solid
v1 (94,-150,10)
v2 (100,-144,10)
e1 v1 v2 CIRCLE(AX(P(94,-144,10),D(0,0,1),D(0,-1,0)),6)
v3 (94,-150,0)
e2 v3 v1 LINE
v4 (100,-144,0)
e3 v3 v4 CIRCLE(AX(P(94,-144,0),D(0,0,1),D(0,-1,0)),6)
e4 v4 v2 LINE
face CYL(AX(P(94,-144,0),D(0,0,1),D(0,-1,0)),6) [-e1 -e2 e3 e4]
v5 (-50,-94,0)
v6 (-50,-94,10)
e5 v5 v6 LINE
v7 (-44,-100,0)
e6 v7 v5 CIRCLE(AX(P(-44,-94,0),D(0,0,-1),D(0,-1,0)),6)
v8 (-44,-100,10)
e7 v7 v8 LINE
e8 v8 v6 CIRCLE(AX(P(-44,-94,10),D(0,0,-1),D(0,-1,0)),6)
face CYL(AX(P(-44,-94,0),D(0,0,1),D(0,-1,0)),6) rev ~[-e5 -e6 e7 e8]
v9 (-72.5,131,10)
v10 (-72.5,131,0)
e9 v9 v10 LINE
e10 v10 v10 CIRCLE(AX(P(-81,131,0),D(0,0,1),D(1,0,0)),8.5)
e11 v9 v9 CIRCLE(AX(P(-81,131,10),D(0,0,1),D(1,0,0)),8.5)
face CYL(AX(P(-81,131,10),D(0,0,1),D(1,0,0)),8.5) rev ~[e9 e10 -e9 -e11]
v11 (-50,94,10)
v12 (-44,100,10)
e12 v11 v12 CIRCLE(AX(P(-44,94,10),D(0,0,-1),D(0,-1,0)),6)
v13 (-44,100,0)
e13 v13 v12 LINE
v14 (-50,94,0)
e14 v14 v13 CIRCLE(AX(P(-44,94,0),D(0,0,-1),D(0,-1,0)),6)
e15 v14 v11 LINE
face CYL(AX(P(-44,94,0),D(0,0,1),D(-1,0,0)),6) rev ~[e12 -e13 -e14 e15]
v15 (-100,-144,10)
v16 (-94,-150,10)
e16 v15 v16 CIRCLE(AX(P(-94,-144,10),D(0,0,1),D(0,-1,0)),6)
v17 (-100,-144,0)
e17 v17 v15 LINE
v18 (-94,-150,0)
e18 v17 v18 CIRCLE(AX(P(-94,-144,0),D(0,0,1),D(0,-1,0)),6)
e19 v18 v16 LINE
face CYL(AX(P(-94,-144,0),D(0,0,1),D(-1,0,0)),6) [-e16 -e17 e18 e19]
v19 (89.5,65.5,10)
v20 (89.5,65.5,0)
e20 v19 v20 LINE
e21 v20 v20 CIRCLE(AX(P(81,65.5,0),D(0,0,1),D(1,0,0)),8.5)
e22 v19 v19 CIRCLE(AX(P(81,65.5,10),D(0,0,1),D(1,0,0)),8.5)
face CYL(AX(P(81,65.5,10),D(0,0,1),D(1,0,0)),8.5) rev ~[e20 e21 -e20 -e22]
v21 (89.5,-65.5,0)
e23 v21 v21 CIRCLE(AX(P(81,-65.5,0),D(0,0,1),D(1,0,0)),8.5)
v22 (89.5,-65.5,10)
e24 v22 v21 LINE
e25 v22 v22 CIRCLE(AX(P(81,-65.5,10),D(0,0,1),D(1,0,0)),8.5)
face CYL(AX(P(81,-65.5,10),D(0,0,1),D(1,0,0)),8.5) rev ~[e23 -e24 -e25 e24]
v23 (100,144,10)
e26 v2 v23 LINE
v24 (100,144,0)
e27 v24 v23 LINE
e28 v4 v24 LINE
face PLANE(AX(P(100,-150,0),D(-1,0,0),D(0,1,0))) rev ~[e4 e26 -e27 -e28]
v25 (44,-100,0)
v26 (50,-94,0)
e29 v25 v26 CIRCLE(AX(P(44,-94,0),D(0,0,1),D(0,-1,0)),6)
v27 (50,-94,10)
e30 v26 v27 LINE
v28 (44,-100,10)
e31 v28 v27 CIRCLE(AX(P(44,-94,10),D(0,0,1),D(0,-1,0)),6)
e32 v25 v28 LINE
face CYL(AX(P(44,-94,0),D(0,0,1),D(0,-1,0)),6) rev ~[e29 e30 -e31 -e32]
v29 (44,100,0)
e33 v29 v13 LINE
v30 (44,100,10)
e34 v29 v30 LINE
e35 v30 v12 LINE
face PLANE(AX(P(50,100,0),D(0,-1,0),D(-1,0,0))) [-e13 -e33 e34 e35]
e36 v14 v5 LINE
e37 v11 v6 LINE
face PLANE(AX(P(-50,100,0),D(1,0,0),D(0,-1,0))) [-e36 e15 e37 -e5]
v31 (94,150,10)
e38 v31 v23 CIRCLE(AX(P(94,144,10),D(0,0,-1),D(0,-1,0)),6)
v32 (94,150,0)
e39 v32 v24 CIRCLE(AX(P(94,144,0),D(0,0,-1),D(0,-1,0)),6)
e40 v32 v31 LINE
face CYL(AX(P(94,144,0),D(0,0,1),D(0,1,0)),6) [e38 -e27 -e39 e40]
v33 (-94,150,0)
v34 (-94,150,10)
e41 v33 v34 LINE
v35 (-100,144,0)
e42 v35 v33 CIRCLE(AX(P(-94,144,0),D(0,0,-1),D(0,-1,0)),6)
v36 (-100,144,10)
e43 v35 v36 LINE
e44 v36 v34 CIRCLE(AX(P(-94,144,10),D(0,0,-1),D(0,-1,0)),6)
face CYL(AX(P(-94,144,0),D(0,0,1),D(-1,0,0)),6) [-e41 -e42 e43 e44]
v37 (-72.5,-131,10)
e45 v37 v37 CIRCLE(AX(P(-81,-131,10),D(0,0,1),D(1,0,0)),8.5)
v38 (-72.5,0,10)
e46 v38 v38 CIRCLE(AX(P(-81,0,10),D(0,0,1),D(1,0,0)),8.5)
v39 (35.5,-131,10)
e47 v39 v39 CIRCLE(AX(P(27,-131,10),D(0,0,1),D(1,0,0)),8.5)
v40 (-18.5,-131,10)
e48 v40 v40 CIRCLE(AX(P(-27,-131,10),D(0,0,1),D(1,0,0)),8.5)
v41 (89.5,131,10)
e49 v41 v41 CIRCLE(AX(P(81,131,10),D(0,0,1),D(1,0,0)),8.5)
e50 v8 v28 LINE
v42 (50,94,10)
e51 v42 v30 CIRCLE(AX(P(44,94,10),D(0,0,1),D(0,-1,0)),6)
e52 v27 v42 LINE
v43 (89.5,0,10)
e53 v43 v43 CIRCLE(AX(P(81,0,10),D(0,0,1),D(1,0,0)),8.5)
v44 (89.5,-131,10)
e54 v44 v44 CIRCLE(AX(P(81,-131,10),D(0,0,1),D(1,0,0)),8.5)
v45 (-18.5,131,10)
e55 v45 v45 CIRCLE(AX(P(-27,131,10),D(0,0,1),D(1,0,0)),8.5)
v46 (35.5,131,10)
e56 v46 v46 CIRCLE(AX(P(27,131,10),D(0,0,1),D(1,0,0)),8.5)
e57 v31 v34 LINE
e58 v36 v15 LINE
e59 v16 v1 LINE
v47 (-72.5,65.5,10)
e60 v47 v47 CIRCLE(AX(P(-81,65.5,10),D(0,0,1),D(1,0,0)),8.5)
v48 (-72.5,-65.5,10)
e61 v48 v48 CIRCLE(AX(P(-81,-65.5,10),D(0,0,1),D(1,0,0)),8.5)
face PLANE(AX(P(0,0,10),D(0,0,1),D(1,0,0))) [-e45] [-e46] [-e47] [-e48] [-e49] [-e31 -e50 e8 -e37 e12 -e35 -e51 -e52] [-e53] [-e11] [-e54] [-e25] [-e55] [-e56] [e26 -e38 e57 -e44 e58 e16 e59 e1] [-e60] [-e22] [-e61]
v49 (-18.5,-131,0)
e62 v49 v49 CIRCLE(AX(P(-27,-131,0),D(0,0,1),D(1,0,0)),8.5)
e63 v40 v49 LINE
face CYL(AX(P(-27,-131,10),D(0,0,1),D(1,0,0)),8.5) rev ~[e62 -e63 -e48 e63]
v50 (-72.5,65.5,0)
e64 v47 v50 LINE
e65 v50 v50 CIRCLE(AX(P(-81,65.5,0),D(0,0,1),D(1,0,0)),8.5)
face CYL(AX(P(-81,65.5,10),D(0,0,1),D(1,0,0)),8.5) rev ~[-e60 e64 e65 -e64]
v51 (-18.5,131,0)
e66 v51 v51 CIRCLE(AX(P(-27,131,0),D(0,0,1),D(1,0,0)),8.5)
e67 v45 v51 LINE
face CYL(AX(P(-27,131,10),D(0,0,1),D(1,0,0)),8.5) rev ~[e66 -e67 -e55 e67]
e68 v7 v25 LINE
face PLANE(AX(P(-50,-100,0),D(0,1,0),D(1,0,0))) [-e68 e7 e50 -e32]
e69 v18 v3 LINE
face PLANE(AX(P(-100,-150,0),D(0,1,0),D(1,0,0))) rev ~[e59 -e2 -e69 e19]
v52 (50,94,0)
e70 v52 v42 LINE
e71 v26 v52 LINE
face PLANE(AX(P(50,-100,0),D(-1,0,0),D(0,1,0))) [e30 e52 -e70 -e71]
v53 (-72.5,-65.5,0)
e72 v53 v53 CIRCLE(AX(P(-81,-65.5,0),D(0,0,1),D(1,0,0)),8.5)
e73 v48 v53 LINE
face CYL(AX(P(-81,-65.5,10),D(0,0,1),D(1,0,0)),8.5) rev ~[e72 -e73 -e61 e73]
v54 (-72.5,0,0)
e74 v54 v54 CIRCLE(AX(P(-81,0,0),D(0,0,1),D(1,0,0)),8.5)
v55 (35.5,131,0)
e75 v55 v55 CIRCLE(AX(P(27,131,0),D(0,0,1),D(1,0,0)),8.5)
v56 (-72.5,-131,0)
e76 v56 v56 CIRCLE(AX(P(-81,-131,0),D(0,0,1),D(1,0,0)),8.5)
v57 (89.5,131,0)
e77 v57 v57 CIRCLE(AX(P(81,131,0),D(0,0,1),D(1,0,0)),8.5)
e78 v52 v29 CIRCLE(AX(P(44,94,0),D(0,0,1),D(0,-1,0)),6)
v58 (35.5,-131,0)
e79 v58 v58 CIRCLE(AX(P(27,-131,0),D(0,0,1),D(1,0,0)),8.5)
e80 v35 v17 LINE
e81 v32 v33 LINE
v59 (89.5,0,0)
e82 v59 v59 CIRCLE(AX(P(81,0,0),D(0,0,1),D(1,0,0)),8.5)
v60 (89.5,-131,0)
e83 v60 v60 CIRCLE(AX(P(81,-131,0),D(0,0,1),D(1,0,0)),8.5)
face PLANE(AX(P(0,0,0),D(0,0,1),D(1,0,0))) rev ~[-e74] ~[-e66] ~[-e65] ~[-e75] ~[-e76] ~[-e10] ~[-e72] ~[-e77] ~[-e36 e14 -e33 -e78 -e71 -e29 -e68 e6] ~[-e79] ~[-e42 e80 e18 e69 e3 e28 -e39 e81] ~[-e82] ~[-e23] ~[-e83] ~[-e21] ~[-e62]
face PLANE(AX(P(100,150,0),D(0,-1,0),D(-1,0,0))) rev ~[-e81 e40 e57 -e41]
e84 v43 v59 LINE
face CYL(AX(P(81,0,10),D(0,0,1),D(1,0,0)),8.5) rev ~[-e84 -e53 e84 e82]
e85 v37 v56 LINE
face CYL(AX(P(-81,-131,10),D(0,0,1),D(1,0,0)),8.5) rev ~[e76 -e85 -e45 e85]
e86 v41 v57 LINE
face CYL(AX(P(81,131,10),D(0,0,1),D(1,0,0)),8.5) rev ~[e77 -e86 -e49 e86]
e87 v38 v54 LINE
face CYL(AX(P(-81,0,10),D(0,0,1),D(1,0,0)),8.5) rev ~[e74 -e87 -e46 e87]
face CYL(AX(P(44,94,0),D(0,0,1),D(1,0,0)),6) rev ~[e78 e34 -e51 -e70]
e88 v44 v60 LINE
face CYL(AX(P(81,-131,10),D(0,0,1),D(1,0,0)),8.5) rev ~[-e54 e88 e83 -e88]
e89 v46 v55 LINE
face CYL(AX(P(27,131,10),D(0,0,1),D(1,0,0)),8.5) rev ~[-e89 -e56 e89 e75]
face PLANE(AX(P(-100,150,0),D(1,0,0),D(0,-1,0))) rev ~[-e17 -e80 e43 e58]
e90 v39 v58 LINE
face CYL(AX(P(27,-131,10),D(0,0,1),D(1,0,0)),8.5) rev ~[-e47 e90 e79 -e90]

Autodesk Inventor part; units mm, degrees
ref_plane "YZ Plane" through (0, 0, 0) normal (1, 0, 0) x (0, 1, 0)
ref_plane "XZ Plane" through (0, 0, 0) normal (0, 1, 0) x (-1, 0, 0)
ref_plane "XY Plane" through (0, 0, 0) normal (0, 0, 1) x (1, 0, 0)
sketch "Sketch2" plane through (0, 0, 0) normal (0, 0, 1) x (1, 0, 0)
  line L0 (-50, -100) -> (50, -100)
  line L1 (50, -100) -> (50, 100)
  line L2 (50, 100) -> (-50, 100)
  line L3 (-50, 100) -> (-50, -100)
  line L4 (-50, -100) -> (50, 100) construction
  line L5 (50, -100) -> (-50, 100) construction
  line L6 (-100, -150) -> (100, -150)
  line L7 (100, -150) -> (100, 150)
  line L8 (100, 150) -> (-100, 150)
  line L9 (-100, 150) -> (-100, -150)
  point P0 (0, 0)
  dimension "d29" = 100
  dimension "d30" = 200
  dimension "d31" = 50
extrude "Plate2" add sketch "Sketch2" along normal blind 10
sketch "Sketch5" plane through (0, 0, 10) normal (0, 0, 1) x (1, 0, 0)
  line L0 (50, 100) -> (50, -100) construction
  line L1 (50, -100) -> (-50, -100) construction
  line L2 (-50, -100) -> (-50, 100) construction
  line L3 (-50, 100) -> (50, 100) construction
  line L4 (100, -150) -> (-100, -150) construction
  line L5 (100, 150) -> (100, -150) construction
  line L6 (-100, 150) -> (100, 150) construction
  line L7 (-100, -150) -> (-100, 150) construction
  line L8 (-81, 131) -> (81, 131) construction
  line L9 (81, 131) -> (81, -131) construction
  line L10 (81, -131) -> (-81, -131) construction
  line L11 (-81, -131) -> (-81, 131) construction
  circle A0 centre (-81, -131) radius 8.5
  circle A1 centre (-81, 131) radius 8.5
  circle A2 centre (-81, 0) radius 8.5
  circle A3 centre (-81, -65.5) radius 8.5
  circle A4 centre (-81, 65.5) radius 8.5
  line L12 (-50, 0) -> (50, 0) construction
  circle A5 centre (-27, -131) radius 8.5
  circle A6 centre (-27, -65.5) radius 8.5
  circle A7 centre (-27, 0) radius 8.5
  circle A8 centre (-27, 65.5) radius 8.5
  circle A9 centre (-27, 131) radius 8.5
  circle A10 centre (27, -131) radius 8.5
  circle A11 centre (27, -65.5) radius 8.5
  circle A12 centre (27, 0) radius 8.5
  circle A13 centre (27, 65.5) radius 8.5
  circle A14 centre (27, 131) radius 8.5
  circle A15 centre (81, -131) radius 8.5
  circle A16 centre (81, -65.5) radius 8.5
  circle A17 centre (81, 0) radius 8.5
  circle A18 centre (81, 65.5) radius 8.5
  circle A19 centre (81, 131) radius 8.5
  point P0 (0, 0)
  point P1 (0, -131)
  dimension "d33" = 17
  dimension "d34" = 19
  dimension "d35" = 65.5
  dimension "d36" = 65.5
  dimension "d39" = 54
extrude "Cut3" cut sketch "Sketch5" against normal blind 10
fillet "Corner Round1" radius 6 8 edges at (-100, -150, 5) (-100, 150, 5) (100, 150, 5) (100, -150, 5) (50, -100, 5) (-50, -100, 5) (-50, 100, 5) (50, 100, 5)
equation "\"d35\" = d36"
equation "\"d44\" = Thickness"
equation "\"d14\" = Thickness"
equation "\"BendReliefDepth\" = 0.5 * Thickness"
equation "\"TransitionRadius\" = BendRadius"
equation "\"JacobiRadiusSize\" = BendRadius"
equation "\"Thickness\" = 10"
equation "\"BendRadius\" = 6"
properties part number "PRS 9606 charging flange round_1200" material "Steel"
